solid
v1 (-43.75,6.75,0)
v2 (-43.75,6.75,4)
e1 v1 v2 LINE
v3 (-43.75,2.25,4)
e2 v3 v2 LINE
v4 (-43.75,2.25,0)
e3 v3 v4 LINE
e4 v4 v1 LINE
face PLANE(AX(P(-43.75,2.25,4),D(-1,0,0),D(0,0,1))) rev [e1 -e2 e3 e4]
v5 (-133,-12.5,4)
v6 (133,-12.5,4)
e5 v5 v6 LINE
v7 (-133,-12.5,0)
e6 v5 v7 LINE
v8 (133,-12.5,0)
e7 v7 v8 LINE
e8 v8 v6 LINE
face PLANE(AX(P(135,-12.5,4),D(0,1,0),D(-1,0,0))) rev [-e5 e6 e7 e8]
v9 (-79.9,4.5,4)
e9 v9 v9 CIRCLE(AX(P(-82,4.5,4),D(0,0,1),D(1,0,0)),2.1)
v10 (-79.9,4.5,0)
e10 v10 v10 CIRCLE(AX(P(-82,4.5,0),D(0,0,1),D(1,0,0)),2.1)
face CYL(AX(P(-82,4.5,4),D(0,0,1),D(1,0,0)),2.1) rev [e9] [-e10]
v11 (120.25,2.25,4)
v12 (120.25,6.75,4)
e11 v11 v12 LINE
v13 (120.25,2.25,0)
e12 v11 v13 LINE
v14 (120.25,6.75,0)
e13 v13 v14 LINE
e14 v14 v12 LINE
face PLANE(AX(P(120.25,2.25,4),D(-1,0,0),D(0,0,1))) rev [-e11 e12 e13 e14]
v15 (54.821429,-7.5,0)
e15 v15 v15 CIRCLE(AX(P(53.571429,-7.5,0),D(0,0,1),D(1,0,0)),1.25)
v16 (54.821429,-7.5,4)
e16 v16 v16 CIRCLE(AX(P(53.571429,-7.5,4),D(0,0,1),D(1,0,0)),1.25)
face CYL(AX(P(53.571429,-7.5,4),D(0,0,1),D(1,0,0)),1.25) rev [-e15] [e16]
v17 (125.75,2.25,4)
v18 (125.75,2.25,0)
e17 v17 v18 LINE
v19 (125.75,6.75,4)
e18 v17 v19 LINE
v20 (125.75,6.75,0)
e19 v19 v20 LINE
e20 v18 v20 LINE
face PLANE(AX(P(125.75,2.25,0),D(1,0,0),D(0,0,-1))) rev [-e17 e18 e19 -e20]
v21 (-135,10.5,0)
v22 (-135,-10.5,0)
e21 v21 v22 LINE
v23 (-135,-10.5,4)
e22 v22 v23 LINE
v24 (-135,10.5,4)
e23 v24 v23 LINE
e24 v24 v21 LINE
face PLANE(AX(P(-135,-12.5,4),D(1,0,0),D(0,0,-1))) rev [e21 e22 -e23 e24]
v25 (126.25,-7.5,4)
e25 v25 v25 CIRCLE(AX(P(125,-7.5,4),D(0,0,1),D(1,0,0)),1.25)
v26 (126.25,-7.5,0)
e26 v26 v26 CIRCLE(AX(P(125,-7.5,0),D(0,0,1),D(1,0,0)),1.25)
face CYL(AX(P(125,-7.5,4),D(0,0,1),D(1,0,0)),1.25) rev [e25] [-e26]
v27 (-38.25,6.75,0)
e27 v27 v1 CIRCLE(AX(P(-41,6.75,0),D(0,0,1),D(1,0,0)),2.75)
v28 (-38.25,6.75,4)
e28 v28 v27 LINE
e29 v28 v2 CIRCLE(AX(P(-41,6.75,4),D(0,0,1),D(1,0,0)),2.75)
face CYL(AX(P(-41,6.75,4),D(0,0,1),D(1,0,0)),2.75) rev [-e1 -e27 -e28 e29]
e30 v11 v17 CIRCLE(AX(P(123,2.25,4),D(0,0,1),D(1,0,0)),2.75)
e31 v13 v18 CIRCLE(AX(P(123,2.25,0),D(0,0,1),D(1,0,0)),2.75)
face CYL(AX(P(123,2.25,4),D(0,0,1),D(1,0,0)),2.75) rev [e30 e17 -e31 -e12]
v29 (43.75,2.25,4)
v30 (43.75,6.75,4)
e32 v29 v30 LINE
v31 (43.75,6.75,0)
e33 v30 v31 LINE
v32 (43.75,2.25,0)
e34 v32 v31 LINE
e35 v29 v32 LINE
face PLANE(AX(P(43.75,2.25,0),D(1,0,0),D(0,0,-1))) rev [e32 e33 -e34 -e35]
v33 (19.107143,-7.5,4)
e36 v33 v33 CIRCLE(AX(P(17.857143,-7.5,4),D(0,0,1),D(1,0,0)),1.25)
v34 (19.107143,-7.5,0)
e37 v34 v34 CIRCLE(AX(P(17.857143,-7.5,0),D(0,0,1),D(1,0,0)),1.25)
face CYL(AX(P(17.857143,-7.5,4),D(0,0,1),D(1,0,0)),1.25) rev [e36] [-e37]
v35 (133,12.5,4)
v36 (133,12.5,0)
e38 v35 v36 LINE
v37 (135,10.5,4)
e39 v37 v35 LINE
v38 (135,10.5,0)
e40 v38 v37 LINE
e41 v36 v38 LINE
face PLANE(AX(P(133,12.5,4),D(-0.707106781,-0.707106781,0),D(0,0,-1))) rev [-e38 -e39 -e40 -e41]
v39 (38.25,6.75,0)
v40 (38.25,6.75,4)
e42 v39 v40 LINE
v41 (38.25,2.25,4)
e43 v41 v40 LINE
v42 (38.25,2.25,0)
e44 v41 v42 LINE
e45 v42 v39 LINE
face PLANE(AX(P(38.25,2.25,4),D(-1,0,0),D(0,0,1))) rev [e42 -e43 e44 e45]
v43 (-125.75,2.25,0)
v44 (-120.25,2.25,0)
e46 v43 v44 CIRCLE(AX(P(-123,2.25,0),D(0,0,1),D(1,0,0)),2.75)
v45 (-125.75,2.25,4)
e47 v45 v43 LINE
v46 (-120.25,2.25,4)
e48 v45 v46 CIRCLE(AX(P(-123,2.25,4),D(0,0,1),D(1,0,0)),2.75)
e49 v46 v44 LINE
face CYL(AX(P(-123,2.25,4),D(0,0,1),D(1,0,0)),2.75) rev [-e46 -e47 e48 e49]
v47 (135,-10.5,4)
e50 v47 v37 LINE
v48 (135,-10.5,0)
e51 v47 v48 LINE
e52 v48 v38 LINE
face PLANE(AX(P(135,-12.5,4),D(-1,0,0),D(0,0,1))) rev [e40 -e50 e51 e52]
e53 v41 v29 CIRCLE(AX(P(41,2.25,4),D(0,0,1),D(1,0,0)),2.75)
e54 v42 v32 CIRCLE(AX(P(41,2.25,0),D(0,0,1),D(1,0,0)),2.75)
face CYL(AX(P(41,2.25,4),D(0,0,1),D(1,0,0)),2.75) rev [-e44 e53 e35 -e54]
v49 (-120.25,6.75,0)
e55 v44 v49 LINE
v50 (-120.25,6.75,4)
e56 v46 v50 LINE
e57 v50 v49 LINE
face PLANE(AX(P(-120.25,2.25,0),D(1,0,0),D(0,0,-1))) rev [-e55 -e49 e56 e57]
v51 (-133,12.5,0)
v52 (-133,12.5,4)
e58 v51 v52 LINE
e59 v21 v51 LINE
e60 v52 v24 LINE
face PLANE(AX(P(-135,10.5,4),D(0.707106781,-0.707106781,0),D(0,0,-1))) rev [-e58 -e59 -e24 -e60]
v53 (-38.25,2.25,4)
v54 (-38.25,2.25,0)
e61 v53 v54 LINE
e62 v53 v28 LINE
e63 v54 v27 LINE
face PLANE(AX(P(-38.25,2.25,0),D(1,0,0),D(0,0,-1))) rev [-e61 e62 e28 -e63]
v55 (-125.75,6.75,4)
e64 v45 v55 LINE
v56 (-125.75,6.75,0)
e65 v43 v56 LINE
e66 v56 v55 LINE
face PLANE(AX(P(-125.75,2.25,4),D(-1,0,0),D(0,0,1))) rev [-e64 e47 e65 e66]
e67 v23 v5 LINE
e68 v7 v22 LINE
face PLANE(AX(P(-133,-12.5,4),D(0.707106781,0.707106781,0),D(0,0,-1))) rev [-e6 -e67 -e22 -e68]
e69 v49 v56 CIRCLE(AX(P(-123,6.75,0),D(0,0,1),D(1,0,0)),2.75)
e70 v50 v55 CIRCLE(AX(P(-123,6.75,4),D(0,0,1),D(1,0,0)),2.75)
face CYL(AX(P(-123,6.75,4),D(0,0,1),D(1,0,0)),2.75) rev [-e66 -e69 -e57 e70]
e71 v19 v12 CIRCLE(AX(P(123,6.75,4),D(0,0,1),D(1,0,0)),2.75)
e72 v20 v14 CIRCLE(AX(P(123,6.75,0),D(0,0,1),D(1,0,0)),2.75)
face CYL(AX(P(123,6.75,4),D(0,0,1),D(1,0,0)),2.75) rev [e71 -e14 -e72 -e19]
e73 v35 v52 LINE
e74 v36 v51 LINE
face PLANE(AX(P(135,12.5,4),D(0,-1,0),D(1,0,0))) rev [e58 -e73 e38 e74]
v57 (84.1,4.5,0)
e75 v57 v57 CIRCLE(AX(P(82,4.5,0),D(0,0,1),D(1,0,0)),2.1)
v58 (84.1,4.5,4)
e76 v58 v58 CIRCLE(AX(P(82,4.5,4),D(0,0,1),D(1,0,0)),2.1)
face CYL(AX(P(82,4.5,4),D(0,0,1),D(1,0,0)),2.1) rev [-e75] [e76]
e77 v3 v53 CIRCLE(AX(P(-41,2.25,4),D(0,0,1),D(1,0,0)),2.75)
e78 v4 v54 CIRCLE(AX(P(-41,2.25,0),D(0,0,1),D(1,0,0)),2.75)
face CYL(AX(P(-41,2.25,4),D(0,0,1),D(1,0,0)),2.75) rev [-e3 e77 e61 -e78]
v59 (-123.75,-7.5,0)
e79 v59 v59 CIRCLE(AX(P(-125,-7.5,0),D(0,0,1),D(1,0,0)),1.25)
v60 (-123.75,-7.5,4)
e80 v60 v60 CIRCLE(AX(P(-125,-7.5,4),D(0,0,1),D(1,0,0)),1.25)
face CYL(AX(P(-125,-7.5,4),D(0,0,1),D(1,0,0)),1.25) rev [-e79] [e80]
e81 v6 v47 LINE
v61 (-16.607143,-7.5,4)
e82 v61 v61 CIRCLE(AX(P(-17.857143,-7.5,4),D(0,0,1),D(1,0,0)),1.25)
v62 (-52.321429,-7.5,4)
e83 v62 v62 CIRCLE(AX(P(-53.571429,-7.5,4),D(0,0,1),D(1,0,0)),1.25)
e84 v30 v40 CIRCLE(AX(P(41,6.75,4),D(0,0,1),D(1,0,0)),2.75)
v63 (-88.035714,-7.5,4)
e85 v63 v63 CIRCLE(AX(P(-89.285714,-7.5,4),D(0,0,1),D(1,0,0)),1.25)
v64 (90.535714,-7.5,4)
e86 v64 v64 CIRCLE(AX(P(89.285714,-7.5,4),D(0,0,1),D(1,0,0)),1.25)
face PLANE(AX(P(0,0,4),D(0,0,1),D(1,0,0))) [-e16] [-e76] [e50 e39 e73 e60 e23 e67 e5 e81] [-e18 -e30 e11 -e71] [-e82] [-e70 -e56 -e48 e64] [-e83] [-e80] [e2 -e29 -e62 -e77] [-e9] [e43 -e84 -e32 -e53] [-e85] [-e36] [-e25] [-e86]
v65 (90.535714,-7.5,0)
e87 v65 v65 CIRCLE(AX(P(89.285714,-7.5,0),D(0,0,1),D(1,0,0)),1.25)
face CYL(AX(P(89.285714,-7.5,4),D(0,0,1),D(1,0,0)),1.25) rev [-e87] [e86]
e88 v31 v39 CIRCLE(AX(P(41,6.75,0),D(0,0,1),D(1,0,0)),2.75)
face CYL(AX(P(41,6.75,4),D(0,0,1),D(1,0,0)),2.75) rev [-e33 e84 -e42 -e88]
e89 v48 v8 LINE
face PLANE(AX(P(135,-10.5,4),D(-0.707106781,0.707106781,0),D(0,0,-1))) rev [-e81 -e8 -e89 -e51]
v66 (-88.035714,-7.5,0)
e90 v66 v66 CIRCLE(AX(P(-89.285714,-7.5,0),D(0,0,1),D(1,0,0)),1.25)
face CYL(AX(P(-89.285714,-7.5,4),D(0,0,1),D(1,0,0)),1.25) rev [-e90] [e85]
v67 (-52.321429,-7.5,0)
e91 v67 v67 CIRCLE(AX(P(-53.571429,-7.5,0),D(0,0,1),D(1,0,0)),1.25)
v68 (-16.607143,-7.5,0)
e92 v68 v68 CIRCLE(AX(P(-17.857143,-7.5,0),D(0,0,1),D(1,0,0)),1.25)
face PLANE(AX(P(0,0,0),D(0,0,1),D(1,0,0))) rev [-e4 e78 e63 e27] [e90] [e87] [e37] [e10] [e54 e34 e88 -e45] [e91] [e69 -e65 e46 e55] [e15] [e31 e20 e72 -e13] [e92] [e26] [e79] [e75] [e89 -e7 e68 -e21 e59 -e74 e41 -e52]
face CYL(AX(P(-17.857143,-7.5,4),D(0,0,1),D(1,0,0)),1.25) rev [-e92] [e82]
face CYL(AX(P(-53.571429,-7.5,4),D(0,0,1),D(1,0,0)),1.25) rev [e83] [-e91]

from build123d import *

# Parameters (mm, degrees)
SKETCH1_W                = 270
SKETCH1_H                = 25
BOSS_EXTRUDE1_DEPTH      = 4
M5_CLEARANCE_SLOT1_DEPTH = 4
LPATTERN1_COUNT          = 4
LPATTERN1_PITCH          = 82
M3_TAPPED_HOLE1_D        = 2.5
LPATTERN2_COUNT          = 8
LPATTERN2_PITCH          = 35.714285714
CHAMFER1_SIZE            = 2
M5_TAPPED_HOLE1_D        = 4.2


# Read off the part's stored shape, not the designer's step: M5 Clearance Slot1
with BuildPart() as part:
    # Sketch1 → Boss-Extrude1 (new body)
    with BuildSketch(Plane.XY):
        Rectangle(SKETCH1_W, SKETCH1_H)
    extrude(amount=BOSS_EXTRUDE1_DEPTH)

    # M5 Clearance Slot1 outline → M5 Clearance Slot1 (cut)
    with BuildSketch(Plane.XY):
        with BuildLine():
            Line((-120.25, 2.25), (-120.25, 6.75))
            ThreePointArc((-120.25, 6.75), (-123, 9.5), (-125.75, 6.75))
            Line((-125.75, 6.75), (-125.75, 2.25))
            ThreePointArc((-125.75, 2.25), (-123, -0.5), (-120.25, 2.25))
        make_face()
    m5_clearance_slot1 = extrude(amount=M5_CLEARANCE_SLOT1_DEPTH, mode=Mode.SUBTRACT)

    # LPattern1: M5 Clearance Slot1 ×4
    with Locations(*[(i * LPATTERN1_PITCH, 0, 0) for i in range(1, LPATTERN1_COUNT)]):
        add(m5_clearance_slot1, mode=Mode.SUBTRACT)

    # M3 Tapped Hole1 (through all)
    with Locations(Plane.XY.offset(4)):
        with Locations((-125, -7.5)):
            m3_tapped_hole1 = Hole(M3_TAPPED_HOLE1_D / 2)

    # LPattern2: M3 Tapped Hole1 ×8
    with Locations(*[(i * LPATTERN2_PITCH, 0, 0) for i in range(1, LPATTERN2_COUNT)]):
        add(m3_tapped_hole1, mode=Mode.SUBTRACT)

    # Chamfer1
    chamfer1_edges = [part.edges().sort_by_distance(p)[0] for p in [
        (-135, 12.5, 2),
        (135, 12.5, 2),
        (135, -12.5, 2),
        (-135, -12.5, 2),
    ]]
    chamfer(chamfer1_edges, length=CHAMFER1_SIZE)

    # M5 Tapped Hole1 (through all)
    with Locations(Plane.XY.offset(4)):
        with Locations((82, 4.5), (-82, 4.5)):
            Hole(M5_TAPPED_HOLE1_D / 2)


solid = part.part
